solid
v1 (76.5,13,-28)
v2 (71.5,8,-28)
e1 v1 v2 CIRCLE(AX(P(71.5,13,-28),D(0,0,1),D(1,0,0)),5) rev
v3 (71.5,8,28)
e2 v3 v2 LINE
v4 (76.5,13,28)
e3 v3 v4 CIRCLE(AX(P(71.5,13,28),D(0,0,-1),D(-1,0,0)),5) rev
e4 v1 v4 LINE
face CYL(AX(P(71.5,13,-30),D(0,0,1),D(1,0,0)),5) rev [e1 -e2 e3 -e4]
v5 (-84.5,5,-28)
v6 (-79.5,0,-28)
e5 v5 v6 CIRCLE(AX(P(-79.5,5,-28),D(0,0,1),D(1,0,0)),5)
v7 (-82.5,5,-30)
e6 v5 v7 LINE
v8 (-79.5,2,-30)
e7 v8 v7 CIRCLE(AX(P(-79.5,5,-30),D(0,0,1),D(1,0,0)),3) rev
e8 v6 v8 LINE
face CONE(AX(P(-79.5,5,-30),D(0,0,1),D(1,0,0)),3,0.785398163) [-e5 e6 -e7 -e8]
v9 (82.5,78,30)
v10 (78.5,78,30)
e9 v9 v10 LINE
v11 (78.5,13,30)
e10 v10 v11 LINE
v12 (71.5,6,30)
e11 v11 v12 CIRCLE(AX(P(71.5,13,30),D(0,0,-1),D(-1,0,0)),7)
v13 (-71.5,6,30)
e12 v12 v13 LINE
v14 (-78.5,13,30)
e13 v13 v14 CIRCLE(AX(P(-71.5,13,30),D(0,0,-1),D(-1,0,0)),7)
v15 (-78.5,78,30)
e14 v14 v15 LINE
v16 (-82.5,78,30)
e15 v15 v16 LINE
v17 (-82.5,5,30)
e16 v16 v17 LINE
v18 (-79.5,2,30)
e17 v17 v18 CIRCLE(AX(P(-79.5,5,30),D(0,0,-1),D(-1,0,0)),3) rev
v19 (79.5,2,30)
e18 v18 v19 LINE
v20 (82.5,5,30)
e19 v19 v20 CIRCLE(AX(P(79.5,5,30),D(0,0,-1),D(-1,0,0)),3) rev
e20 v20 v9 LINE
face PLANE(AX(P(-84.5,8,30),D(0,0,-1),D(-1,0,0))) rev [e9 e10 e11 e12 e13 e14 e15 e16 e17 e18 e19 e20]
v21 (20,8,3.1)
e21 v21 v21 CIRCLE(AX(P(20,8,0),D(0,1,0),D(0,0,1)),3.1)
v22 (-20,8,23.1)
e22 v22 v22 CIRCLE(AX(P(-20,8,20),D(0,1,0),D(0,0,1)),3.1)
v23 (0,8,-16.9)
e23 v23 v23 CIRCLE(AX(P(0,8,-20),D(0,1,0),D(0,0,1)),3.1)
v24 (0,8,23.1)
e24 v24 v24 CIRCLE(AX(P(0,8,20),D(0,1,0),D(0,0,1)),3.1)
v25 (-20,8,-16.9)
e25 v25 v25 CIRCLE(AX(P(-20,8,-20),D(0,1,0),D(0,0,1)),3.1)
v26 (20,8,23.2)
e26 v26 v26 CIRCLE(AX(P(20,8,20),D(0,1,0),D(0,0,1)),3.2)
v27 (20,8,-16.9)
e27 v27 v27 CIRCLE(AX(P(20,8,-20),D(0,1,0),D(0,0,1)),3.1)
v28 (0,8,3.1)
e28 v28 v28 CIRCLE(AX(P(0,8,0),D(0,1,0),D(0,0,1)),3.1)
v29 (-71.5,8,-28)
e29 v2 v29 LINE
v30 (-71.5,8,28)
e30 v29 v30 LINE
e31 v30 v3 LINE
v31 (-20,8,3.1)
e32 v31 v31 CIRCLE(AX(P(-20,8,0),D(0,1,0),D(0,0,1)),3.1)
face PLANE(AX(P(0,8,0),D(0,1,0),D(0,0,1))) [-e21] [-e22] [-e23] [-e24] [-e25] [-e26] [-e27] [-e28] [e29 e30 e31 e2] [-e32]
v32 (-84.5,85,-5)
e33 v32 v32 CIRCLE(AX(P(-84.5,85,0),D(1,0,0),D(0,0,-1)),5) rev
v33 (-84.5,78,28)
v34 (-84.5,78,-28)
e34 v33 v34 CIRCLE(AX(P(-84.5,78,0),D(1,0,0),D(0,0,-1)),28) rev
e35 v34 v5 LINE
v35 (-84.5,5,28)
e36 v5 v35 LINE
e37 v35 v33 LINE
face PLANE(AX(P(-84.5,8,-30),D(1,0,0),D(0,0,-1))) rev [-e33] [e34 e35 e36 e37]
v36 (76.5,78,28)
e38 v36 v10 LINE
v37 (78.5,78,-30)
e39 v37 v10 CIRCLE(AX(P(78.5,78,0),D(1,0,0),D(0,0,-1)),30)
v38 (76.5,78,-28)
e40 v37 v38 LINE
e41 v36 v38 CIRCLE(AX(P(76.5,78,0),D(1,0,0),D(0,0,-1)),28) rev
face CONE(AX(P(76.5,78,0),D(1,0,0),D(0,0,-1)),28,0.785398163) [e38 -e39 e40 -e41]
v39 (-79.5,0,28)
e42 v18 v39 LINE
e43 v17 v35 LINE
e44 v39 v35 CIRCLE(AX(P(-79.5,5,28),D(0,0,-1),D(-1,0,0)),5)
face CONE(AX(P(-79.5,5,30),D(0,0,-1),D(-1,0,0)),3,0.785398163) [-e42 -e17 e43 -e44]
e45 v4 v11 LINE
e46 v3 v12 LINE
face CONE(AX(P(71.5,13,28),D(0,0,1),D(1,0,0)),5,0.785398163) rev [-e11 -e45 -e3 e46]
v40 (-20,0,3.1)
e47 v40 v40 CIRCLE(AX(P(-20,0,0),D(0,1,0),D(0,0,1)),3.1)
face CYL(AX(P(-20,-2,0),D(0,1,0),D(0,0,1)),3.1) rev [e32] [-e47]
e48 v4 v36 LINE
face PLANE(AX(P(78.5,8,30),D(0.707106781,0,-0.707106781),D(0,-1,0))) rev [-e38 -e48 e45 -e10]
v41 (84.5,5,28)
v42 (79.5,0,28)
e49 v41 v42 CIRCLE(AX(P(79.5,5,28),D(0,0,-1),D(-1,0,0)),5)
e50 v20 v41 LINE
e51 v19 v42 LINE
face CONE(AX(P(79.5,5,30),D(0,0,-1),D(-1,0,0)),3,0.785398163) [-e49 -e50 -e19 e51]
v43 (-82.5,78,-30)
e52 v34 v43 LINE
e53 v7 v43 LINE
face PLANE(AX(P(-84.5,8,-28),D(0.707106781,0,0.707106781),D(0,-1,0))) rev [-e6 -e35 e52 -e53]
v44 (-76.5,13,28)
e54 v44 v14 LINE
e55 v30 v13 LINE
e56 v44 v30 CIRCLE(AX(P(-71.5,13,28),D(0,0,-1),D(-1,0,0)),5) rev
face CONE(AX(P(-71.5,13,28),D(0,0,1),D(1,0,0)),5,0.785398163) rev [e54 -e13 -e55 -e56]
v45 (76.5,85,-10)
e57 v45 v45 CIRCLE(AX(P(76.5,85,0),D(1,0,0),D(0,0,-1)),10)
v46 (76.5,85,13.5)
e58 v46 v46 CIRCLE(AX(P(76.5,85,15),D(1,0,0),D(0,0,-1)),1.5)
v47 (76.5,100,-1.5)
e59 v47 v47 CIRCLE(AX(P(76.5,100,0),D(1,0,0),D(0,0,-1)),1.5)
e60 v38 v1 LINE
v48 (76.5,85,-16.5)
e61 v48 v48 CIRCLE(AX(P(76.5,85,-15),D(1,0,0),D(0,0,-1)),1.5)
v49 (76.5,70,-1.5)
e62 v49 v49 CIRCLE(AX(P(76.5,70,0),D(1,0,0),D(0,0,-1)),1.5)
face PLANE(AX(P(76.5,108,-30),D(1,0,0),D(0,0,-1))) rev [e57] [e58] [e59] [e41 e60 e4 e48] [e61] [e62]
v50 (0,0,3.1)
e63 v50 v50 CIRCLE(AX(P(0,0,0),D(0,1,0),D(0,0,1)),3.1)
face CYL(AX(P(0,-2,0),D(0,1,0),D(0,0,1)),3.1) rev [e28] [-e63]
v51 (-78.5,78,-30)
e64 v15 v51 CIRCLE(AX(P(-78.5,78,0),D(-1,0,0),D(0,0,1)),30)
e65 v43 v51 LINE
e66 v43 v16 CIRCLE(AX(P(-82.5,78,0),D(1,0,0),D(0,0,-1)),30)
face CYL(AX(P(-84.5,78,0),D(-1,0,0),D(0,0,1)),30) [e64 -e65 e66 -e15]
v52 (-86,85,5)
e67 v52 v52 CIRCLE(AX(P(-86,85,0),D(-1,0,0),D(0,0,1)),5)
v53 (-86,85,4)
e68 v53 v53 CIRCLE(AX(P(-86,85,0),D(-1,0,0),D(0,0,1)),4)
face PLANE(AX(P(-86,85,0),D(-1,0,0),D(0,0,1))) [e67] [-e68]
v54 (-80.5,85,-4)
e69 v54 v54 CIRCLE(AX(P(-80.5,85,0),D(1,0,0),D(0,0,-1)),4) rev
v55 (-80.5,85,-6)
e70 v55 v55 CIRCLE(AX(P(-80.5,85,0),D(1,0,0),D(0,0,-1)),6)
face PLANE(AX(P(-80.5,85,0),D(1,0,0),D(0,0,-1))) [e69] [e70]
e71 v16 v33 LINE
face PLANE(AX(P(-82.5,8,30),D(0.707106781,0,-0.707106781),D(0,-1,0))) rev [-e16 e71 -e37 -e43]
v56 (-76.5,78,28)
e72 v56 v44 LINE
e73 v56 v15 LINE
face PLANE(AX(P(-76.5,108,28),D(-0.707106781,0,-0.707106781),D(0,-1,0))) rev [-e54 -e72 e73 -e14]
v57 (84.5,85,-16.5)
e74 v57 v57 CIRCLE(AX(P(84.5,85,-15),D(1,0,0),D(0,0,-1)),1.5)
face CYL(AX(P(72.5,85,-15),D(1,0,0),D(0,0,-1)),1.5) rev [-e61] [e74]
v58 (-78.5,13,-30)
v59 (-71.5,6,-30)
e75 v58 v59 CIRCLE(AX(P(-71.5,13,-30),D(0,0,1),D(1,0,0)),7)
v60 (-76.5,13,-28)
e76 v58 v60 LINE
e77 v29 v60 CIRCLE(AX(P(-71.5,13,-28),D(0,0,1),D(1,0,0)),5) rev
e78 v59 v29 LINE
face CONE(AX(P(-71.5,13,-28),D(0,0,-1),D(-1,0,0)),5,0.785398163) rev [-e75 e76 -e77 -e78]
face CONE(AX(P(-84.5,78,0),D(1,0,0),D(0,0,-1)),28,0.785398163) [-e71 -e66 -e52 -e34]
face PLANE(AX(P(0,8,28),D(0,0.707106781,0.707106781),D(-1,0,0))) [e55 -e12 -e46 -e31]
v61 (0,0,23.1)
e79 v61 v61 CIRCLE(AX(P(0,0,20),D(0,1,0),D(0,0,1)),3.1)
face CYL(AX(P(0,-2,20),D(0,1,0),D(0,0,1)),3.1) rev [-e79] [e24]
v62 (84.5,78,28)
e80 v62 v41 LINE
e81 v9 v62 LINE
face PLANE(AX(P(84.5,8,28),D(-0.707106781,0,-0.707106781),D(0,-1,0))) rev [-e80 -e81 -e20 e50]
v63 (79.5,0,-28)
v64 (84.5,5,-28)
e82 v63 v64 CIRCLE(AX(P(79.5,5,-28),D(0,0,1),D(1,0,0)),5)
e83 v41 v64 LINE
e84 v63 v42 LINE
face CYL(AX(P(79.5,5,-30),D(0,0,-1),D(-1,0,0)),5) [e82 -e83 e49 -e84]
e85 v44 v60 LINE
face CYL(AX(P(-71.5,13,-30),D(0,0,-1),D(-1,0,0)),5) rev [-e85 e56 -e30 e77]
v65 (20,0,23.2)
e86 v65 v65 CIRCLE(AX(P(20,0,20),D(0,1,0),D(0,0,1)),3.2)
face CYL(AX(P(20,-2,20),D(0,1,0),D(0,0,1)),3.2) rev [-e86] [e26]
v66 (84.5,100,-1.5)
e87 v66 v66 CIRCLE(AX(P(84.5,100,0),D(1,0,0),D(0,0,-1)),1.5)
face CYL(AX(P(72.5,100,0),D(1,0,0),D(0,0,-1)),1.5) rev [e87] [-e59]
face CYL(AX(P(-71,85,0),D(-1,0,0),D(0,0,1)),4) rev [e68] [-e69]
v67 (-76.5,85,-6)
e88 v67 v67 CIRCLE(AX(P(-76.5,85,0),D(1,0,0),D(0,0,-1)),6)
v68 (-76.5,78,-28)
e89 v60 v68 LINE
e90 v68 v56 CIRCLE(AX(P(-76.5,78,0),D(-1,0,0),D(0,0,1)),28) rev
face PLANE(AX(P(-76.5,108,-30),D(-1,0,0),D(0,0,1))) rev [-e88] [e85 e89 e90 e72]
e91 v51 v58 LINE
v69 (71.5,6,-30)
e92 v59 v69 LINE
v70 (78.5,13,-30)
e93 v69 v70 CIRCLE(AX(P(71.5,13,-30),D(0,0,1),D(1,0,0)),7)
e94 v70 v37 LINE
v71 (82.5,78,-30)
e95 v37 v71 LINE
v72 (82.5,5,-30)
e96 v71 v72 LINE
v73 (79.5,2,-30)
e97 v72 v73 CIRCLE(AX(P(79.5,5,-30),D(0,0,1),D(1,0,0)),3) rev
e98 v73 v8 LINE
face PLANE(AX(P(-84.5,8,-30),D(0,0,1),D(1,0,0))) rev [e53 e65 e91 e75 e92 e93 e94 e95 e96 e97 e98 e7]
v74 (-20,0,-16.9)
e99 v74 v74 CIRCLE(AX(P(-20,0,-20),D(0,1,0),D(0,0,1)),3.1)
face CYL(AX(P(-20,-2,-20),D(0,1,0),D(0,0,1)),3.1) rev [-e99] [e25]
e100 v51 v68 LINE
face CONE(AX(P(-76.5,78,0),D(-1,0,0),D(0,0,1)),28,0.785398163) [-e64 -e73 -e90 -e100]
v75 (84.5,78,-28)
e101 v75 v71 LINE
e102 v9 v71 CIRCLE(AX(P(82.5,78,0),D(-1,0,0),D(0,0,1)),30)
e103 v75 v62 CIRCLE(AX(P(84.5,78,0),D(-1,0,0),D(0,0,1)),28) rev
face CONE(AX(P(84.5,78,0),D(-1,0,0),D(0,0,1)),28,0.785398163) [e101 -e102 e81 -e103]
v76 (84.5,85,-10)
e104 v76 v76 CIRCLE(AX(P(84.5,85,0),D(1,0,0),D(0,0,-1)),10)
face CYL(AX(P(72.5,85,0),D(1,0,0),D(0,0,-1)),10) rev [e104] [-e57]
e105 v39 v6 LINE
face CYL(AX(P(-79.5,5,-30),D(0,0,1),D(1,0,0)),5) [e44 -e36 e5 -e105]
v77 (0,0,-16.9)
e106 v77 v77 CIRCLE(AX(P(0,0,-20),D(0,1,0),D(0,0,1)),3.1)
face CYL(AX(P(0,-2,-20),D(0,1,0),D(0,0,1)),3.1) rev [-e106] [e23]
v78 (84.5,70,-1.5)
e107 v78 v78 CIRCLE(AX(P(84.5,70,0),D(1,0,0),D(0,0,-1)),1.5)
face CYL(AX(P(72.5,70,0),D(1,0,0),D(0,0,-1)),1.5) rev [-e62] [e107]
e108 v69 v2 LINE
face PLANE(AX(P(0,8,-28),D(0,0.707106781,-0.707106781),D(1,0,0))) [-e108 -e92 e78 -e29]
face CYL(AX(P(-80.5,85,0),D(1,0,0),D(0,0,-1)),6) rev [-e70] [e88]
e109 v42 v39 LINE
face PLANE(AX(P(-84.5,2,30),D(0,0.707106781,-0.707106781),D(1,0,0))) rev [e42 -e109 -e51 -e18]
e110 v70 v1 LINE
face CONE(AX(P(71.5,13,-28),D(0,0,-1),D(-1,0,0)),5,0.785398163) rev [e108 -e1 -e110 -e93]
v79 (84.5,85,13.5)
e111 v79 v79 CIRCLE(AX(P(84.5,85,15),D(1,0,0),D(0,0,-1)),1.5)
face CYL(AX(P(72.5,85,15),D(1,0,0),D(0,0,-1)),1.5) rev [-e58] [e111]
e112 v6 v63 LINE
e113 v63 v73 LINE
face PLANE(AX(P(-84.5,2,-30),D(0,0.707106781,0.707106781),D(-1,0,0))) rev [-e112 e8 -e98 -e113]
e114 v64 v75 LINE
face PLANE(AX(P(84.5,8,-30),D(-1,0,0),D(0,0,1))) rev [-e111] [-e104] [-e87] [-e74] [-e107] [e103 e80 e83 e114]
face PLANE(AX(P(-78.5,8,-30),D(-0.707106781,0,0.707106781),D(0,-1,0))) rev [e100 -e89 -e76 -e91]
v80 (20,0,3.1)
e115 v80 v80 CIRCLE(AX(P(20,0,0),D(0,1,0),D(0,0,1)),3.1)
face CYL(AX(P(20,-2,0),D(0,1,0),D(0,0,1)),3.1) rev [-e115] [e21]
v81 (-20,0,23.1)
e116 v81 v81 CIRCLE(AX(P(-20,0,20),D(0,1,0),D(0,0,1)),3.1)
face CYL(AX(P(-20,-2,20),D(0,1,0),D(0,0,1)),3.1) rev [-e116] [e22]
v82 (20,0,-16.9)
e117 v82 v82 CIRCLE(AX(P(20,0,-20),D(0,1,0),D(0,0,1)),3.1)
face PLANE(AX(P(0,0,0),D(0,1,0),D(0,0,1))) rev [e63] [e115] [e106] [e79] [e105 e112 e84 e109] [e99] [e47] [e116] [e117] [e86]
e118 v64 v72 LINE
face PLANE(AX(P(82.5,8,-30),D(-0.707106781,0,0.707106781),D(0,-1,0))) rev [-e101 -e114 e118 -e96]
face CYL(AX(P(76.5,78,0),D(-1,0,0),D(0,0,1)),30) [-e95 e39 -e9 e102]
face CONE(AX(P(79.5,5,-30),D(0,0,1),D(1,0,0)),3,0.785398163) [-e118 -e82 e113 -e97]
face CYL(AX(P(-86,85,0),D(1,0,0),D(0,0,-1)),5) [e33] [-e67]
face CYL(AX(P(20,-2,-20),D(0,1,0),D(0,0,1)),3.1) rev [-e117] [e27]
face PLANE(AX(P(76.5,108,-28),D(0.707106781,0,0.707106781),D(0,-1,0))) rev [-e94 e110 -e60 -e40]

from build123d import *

# Parameters (mm, degrees)
SKETCH1_W           = 169
SKETCH1_H           = 60
BOSS_EXTRUDE1_DEPTH = 8
SKETCH2_W           = 8
SKETCH2_H           = 60
BOSS_EXTRUDE2_DEPTH = 100
SKETCH3_R           = 10
SKETCH3_R_2         = 1.5
CUT_EXTRUDE1_DEPTH  = 12
SKETCH5_R           = 5
BOSS_EXTRUDE3_DEPTH = 1.5
SKETCH6_R           = 4
CUT_EXTRUDE3_DEPTH  = 15
SKETCH7_R           = 6
CUT_EXTRUDE4_DEPTH  = 4
FILLET1_RADIUS      = 30
FILLET1_LENGTH      = 8
FILLET2_RADIUS      = 30
FILLET2_LENGTH      = 8
FILLET3_R           = 5
FILLET4_R           = 5
FILLET5_R           = 5
FILLET6_R           = 5
CHAMFER1_SIZE       = 2
SKETCH8_R           = 3.1
SKETCH8_R_2         = 3.2
CUT_EXTRUDE5_DEPTH  = 10


with BuildPart() as part:
    # Sketch1 → Boss-Extrude1 (new body)
    with BuildSketch(Plane(origin=(0, 0, 0), x_dir=(1, 0, 0), z_dir=(0, 1, 0))):
        Rectangle(SKETCH1_W, SKETCH1_H)
    extrude(amount=BOSS_EXTRUDE1_DEPTH)

    # Sketch2 → Boss-Extrude2 (add)
    with BuildSketch(Plane(origin=(0, 8, 0), x_dir=(1, 0, 0), z_dir=(0, 1, 0))):
        with Locations((-80.5, 0)):
            Rectangle(SKETCH2_W, SKETCH2_H)
        with Locations((80.5, 0)):
            Rectangle(SKETCH2_W, SKETCH2_H)
    extrude(amount=BOSS_EXTRUDE2_DEPTH)

    # Sketch3 → Cut-Extrude1 (cut)
    with BuildSketch(Plane(origin=(84.5, 0, 0), x_dir=(0, 0, -1), z_dir=(1, 0, 0))):
        with Locations((0, 85)):
            Circle(SKETCH3_R)
        with Locations((0, 70)):
            Circle(SKETCH3_R_2)
        with Locations((0, 100)):
            Circle(SKETCH3_R_2)
        with Locations((-15, 85)):
            Circle(SKETCH3_R_2)
        with Locations((15, 85)):
            Circle(SKETCH3_R_2)
    extrude(amount=-CUT_EXTRUDE1_DEPTH, mode=Mode.SUBTRACT)

    # Sketch5 → Boss-Extrude3 (add)
    with BuildSketch(Plane.ZY.offset(84.5)):
        with Locations(Location((0, 85, 0), (0, 0, 180))):
            Circle(SKETCH5_R)
    extrude(amount=BOSS_EXTRUDE3_DEPTH)

    # Sketch6 → Cut-Extrude3 (cut)
    with BuildSketch(Plane.ZY.offset(86)):
        with Locations((0, 85)):
            Circle(SKETCH6_R)
    extrude(amount=-CUT_EXTRUDE3_DEPTH, mode=Mode.SUBTRACT)

    # Sketch7 → Cut-Extrude4 (cut)
    with BuildSketch(Plane(origin=(-76.5, 0, 0), x_dir=(0, 0, -1), z_dir=(1, 0, 0))):
        with Locations((0, 85)):
            Circle(SKETCH7_R)
    extrude(amount=-CUT_EXTRUDE4_DEPTH, mode=Mode.SUBTRACT)

    # Fillet1: full round fillet: the end face becomes a half cylinder, R = half its width
    fillet1_face = Plane((80.5, 108, 0), x_dir=(-1, 0, 0), z_dir=(0, 1, 0))  # on the end face: x along it, z out of the body
    fillet1_slab = fillet1_face.offset(-FILLET1_RADIUS / 2) * Box(FILLET1_LENGTH, 2 * FILLET1_RADIUS, FILLET1_RADIUS, mode=Mode.PRIVATE)  # the body's end, R deep
    fillet1_round = Plane((80.5, 78, 0), x_dir=(0, 1, 0), z_dir=(-1, 0, 0)) * Cylinder(FILLET1_RADIUS, FILLET1_LENGTH, mode=Mode.PRIVATE)  # its axis R under the face
    add(fillet1_slab - fillet1_round, mode=Mode.SUBTRACT)

    # Fillet2: full round fillet: the end face becomes a half cylinder, R = half its width
    fillet2_face = Plane((-80.5, 108, 0), x_dir=(1, 0, 0), z_dir=(0, 1, 0))  # on the end face: x along it, z out of the body
    fillet2_slab = fillet2_face.offset(-FILLET2_RADIUS / 2) * Box(FILLET2_LENGTH, 2 * FILLET2_RADIUS, FILLET2_RADIUS, mode=Mode.PRIVATE)  # the body's end, R deep
    fillet2_round = Plane((-80.5, 78, 0), x_dir=(0, 1, 0), z_dir=(1, 0, 0)) * Cylinder(FILLET2_RADIUS, FILLET2_LENGTH, mode=Mode.PRIVATE)  # its axis R under the face
    add(fillet2_slab - fillet2_round, mode=Mode.SUBTRACT)

    # Fillet3
    fillet3_edges = [part.edges().sort_by_distance(p)[0] for p in [
        (76.5, 8, 0),
    ]]
    fillet(fillet3_edges, radius=FILLET3_R)

    # Fillet4
    fillet4_edges = [part.edges().sort_by_distance(p)[0] for p in [
        (-76.5, 8, 0),
    ]]
    fillet(fillet4_edges, radius=FILLET4_R)

    # Fillet5
    fillet5_edges = [part.edges().sort_by_distance(p)[0] for p in [
        (84.5, 0, 0),
    ]]
    fillet(fillet5_edges, radius=FILLET5_R)

    # Fillet6
    fillet6_edges = [part.edges().sort_by_distance(p)[0] for p in [
        (-84.5, 0, 0),
    ]]
    fillet(fillet6_edges, radius=FILLET6_R)

    # Chamfer1
    chamfer1_edges = [part.edges().sort_by_distance(p)[0] for p in [
        (75.035533906, 9.464466094, -30),
        (75.035533906, 9.464466094, 30),
        (0, 8, 30),
        (-75.035533906, 9.464466094, 30),
        (-75.035533906, 9.464466094, -30),
        (0, 0, -30),
        (83.035533906, 1.464466094, 30),
        (83.035533906, 1.464466094, -30),
        (0, 0, 30),
        (-83.035533906, 1.464466094, -30),
        (-83.035533906, 1.464466094, 30),
        (76.5, 45.5, -30),
        (84.5, 41.5, -30),
        (84.5, 41.5, 30),
        (76.5, 45.5, 30),
        (76.5, 108, 0),
        (84.5, 108, 0),
        (-84.5, 41.5, -30),
        (-76.5, 45.5, -30),
        (-76.5, 45.5, 30),
        (-84.5, 41.5, 30),
        (-84.5, 108, 0),
        (-76.5, 108, 0),
        (0, 8, -30),
    ]]
    chamfer(chamfer1_edges, length=CHAMFER1_SIZE)

    # Sketch8 → Cut-Extrude5 (cut)
    with BuildSketch(Plane(origin=(0, 8, 0), x_dir=(1, 0, 0), z_dir=(0, 1, 0))):
        with Locations(Location((0, 0, 0), (0, 0, 270))):
            Circle(SKETCH8_R)
        with Locations(Location((0, 20, 0), (0, 0, 270))):
            Circle(SKETCH8_R)
        with Locations(Location((0, -20, 0), (0, 0, 270))):
            Circle(SKETCH8_R)
        with Locations(Location((-20, -20, 0), (0, 0, 270))):
            Circle(SKETCH8_R)
        with Locations(Location((-20, 20, 0), (0, 0, 270))):
            Circle(SKETCH8_R)
        with Locations(Location((-20, 0, 0), (0, 0, 270))):
            Circle(SKETCH8_R)
        with Locations(Location((20, -20, 0), (0, 0, 270))):
            Circle(SKETCH8_R_2)
        with Locations(Location((20, 0, 0), (0, 0, 270))):
            Circle(SKETCH8_R)
        with Locations(Location((20, 20, 0), (0, 0, 270))):
            Circle(SKETCH8_R)
    extrude(amount=-CUT_EXTRUDE5_DEPTH, mode=Mode.SUBTRACT)


solid = part.part
